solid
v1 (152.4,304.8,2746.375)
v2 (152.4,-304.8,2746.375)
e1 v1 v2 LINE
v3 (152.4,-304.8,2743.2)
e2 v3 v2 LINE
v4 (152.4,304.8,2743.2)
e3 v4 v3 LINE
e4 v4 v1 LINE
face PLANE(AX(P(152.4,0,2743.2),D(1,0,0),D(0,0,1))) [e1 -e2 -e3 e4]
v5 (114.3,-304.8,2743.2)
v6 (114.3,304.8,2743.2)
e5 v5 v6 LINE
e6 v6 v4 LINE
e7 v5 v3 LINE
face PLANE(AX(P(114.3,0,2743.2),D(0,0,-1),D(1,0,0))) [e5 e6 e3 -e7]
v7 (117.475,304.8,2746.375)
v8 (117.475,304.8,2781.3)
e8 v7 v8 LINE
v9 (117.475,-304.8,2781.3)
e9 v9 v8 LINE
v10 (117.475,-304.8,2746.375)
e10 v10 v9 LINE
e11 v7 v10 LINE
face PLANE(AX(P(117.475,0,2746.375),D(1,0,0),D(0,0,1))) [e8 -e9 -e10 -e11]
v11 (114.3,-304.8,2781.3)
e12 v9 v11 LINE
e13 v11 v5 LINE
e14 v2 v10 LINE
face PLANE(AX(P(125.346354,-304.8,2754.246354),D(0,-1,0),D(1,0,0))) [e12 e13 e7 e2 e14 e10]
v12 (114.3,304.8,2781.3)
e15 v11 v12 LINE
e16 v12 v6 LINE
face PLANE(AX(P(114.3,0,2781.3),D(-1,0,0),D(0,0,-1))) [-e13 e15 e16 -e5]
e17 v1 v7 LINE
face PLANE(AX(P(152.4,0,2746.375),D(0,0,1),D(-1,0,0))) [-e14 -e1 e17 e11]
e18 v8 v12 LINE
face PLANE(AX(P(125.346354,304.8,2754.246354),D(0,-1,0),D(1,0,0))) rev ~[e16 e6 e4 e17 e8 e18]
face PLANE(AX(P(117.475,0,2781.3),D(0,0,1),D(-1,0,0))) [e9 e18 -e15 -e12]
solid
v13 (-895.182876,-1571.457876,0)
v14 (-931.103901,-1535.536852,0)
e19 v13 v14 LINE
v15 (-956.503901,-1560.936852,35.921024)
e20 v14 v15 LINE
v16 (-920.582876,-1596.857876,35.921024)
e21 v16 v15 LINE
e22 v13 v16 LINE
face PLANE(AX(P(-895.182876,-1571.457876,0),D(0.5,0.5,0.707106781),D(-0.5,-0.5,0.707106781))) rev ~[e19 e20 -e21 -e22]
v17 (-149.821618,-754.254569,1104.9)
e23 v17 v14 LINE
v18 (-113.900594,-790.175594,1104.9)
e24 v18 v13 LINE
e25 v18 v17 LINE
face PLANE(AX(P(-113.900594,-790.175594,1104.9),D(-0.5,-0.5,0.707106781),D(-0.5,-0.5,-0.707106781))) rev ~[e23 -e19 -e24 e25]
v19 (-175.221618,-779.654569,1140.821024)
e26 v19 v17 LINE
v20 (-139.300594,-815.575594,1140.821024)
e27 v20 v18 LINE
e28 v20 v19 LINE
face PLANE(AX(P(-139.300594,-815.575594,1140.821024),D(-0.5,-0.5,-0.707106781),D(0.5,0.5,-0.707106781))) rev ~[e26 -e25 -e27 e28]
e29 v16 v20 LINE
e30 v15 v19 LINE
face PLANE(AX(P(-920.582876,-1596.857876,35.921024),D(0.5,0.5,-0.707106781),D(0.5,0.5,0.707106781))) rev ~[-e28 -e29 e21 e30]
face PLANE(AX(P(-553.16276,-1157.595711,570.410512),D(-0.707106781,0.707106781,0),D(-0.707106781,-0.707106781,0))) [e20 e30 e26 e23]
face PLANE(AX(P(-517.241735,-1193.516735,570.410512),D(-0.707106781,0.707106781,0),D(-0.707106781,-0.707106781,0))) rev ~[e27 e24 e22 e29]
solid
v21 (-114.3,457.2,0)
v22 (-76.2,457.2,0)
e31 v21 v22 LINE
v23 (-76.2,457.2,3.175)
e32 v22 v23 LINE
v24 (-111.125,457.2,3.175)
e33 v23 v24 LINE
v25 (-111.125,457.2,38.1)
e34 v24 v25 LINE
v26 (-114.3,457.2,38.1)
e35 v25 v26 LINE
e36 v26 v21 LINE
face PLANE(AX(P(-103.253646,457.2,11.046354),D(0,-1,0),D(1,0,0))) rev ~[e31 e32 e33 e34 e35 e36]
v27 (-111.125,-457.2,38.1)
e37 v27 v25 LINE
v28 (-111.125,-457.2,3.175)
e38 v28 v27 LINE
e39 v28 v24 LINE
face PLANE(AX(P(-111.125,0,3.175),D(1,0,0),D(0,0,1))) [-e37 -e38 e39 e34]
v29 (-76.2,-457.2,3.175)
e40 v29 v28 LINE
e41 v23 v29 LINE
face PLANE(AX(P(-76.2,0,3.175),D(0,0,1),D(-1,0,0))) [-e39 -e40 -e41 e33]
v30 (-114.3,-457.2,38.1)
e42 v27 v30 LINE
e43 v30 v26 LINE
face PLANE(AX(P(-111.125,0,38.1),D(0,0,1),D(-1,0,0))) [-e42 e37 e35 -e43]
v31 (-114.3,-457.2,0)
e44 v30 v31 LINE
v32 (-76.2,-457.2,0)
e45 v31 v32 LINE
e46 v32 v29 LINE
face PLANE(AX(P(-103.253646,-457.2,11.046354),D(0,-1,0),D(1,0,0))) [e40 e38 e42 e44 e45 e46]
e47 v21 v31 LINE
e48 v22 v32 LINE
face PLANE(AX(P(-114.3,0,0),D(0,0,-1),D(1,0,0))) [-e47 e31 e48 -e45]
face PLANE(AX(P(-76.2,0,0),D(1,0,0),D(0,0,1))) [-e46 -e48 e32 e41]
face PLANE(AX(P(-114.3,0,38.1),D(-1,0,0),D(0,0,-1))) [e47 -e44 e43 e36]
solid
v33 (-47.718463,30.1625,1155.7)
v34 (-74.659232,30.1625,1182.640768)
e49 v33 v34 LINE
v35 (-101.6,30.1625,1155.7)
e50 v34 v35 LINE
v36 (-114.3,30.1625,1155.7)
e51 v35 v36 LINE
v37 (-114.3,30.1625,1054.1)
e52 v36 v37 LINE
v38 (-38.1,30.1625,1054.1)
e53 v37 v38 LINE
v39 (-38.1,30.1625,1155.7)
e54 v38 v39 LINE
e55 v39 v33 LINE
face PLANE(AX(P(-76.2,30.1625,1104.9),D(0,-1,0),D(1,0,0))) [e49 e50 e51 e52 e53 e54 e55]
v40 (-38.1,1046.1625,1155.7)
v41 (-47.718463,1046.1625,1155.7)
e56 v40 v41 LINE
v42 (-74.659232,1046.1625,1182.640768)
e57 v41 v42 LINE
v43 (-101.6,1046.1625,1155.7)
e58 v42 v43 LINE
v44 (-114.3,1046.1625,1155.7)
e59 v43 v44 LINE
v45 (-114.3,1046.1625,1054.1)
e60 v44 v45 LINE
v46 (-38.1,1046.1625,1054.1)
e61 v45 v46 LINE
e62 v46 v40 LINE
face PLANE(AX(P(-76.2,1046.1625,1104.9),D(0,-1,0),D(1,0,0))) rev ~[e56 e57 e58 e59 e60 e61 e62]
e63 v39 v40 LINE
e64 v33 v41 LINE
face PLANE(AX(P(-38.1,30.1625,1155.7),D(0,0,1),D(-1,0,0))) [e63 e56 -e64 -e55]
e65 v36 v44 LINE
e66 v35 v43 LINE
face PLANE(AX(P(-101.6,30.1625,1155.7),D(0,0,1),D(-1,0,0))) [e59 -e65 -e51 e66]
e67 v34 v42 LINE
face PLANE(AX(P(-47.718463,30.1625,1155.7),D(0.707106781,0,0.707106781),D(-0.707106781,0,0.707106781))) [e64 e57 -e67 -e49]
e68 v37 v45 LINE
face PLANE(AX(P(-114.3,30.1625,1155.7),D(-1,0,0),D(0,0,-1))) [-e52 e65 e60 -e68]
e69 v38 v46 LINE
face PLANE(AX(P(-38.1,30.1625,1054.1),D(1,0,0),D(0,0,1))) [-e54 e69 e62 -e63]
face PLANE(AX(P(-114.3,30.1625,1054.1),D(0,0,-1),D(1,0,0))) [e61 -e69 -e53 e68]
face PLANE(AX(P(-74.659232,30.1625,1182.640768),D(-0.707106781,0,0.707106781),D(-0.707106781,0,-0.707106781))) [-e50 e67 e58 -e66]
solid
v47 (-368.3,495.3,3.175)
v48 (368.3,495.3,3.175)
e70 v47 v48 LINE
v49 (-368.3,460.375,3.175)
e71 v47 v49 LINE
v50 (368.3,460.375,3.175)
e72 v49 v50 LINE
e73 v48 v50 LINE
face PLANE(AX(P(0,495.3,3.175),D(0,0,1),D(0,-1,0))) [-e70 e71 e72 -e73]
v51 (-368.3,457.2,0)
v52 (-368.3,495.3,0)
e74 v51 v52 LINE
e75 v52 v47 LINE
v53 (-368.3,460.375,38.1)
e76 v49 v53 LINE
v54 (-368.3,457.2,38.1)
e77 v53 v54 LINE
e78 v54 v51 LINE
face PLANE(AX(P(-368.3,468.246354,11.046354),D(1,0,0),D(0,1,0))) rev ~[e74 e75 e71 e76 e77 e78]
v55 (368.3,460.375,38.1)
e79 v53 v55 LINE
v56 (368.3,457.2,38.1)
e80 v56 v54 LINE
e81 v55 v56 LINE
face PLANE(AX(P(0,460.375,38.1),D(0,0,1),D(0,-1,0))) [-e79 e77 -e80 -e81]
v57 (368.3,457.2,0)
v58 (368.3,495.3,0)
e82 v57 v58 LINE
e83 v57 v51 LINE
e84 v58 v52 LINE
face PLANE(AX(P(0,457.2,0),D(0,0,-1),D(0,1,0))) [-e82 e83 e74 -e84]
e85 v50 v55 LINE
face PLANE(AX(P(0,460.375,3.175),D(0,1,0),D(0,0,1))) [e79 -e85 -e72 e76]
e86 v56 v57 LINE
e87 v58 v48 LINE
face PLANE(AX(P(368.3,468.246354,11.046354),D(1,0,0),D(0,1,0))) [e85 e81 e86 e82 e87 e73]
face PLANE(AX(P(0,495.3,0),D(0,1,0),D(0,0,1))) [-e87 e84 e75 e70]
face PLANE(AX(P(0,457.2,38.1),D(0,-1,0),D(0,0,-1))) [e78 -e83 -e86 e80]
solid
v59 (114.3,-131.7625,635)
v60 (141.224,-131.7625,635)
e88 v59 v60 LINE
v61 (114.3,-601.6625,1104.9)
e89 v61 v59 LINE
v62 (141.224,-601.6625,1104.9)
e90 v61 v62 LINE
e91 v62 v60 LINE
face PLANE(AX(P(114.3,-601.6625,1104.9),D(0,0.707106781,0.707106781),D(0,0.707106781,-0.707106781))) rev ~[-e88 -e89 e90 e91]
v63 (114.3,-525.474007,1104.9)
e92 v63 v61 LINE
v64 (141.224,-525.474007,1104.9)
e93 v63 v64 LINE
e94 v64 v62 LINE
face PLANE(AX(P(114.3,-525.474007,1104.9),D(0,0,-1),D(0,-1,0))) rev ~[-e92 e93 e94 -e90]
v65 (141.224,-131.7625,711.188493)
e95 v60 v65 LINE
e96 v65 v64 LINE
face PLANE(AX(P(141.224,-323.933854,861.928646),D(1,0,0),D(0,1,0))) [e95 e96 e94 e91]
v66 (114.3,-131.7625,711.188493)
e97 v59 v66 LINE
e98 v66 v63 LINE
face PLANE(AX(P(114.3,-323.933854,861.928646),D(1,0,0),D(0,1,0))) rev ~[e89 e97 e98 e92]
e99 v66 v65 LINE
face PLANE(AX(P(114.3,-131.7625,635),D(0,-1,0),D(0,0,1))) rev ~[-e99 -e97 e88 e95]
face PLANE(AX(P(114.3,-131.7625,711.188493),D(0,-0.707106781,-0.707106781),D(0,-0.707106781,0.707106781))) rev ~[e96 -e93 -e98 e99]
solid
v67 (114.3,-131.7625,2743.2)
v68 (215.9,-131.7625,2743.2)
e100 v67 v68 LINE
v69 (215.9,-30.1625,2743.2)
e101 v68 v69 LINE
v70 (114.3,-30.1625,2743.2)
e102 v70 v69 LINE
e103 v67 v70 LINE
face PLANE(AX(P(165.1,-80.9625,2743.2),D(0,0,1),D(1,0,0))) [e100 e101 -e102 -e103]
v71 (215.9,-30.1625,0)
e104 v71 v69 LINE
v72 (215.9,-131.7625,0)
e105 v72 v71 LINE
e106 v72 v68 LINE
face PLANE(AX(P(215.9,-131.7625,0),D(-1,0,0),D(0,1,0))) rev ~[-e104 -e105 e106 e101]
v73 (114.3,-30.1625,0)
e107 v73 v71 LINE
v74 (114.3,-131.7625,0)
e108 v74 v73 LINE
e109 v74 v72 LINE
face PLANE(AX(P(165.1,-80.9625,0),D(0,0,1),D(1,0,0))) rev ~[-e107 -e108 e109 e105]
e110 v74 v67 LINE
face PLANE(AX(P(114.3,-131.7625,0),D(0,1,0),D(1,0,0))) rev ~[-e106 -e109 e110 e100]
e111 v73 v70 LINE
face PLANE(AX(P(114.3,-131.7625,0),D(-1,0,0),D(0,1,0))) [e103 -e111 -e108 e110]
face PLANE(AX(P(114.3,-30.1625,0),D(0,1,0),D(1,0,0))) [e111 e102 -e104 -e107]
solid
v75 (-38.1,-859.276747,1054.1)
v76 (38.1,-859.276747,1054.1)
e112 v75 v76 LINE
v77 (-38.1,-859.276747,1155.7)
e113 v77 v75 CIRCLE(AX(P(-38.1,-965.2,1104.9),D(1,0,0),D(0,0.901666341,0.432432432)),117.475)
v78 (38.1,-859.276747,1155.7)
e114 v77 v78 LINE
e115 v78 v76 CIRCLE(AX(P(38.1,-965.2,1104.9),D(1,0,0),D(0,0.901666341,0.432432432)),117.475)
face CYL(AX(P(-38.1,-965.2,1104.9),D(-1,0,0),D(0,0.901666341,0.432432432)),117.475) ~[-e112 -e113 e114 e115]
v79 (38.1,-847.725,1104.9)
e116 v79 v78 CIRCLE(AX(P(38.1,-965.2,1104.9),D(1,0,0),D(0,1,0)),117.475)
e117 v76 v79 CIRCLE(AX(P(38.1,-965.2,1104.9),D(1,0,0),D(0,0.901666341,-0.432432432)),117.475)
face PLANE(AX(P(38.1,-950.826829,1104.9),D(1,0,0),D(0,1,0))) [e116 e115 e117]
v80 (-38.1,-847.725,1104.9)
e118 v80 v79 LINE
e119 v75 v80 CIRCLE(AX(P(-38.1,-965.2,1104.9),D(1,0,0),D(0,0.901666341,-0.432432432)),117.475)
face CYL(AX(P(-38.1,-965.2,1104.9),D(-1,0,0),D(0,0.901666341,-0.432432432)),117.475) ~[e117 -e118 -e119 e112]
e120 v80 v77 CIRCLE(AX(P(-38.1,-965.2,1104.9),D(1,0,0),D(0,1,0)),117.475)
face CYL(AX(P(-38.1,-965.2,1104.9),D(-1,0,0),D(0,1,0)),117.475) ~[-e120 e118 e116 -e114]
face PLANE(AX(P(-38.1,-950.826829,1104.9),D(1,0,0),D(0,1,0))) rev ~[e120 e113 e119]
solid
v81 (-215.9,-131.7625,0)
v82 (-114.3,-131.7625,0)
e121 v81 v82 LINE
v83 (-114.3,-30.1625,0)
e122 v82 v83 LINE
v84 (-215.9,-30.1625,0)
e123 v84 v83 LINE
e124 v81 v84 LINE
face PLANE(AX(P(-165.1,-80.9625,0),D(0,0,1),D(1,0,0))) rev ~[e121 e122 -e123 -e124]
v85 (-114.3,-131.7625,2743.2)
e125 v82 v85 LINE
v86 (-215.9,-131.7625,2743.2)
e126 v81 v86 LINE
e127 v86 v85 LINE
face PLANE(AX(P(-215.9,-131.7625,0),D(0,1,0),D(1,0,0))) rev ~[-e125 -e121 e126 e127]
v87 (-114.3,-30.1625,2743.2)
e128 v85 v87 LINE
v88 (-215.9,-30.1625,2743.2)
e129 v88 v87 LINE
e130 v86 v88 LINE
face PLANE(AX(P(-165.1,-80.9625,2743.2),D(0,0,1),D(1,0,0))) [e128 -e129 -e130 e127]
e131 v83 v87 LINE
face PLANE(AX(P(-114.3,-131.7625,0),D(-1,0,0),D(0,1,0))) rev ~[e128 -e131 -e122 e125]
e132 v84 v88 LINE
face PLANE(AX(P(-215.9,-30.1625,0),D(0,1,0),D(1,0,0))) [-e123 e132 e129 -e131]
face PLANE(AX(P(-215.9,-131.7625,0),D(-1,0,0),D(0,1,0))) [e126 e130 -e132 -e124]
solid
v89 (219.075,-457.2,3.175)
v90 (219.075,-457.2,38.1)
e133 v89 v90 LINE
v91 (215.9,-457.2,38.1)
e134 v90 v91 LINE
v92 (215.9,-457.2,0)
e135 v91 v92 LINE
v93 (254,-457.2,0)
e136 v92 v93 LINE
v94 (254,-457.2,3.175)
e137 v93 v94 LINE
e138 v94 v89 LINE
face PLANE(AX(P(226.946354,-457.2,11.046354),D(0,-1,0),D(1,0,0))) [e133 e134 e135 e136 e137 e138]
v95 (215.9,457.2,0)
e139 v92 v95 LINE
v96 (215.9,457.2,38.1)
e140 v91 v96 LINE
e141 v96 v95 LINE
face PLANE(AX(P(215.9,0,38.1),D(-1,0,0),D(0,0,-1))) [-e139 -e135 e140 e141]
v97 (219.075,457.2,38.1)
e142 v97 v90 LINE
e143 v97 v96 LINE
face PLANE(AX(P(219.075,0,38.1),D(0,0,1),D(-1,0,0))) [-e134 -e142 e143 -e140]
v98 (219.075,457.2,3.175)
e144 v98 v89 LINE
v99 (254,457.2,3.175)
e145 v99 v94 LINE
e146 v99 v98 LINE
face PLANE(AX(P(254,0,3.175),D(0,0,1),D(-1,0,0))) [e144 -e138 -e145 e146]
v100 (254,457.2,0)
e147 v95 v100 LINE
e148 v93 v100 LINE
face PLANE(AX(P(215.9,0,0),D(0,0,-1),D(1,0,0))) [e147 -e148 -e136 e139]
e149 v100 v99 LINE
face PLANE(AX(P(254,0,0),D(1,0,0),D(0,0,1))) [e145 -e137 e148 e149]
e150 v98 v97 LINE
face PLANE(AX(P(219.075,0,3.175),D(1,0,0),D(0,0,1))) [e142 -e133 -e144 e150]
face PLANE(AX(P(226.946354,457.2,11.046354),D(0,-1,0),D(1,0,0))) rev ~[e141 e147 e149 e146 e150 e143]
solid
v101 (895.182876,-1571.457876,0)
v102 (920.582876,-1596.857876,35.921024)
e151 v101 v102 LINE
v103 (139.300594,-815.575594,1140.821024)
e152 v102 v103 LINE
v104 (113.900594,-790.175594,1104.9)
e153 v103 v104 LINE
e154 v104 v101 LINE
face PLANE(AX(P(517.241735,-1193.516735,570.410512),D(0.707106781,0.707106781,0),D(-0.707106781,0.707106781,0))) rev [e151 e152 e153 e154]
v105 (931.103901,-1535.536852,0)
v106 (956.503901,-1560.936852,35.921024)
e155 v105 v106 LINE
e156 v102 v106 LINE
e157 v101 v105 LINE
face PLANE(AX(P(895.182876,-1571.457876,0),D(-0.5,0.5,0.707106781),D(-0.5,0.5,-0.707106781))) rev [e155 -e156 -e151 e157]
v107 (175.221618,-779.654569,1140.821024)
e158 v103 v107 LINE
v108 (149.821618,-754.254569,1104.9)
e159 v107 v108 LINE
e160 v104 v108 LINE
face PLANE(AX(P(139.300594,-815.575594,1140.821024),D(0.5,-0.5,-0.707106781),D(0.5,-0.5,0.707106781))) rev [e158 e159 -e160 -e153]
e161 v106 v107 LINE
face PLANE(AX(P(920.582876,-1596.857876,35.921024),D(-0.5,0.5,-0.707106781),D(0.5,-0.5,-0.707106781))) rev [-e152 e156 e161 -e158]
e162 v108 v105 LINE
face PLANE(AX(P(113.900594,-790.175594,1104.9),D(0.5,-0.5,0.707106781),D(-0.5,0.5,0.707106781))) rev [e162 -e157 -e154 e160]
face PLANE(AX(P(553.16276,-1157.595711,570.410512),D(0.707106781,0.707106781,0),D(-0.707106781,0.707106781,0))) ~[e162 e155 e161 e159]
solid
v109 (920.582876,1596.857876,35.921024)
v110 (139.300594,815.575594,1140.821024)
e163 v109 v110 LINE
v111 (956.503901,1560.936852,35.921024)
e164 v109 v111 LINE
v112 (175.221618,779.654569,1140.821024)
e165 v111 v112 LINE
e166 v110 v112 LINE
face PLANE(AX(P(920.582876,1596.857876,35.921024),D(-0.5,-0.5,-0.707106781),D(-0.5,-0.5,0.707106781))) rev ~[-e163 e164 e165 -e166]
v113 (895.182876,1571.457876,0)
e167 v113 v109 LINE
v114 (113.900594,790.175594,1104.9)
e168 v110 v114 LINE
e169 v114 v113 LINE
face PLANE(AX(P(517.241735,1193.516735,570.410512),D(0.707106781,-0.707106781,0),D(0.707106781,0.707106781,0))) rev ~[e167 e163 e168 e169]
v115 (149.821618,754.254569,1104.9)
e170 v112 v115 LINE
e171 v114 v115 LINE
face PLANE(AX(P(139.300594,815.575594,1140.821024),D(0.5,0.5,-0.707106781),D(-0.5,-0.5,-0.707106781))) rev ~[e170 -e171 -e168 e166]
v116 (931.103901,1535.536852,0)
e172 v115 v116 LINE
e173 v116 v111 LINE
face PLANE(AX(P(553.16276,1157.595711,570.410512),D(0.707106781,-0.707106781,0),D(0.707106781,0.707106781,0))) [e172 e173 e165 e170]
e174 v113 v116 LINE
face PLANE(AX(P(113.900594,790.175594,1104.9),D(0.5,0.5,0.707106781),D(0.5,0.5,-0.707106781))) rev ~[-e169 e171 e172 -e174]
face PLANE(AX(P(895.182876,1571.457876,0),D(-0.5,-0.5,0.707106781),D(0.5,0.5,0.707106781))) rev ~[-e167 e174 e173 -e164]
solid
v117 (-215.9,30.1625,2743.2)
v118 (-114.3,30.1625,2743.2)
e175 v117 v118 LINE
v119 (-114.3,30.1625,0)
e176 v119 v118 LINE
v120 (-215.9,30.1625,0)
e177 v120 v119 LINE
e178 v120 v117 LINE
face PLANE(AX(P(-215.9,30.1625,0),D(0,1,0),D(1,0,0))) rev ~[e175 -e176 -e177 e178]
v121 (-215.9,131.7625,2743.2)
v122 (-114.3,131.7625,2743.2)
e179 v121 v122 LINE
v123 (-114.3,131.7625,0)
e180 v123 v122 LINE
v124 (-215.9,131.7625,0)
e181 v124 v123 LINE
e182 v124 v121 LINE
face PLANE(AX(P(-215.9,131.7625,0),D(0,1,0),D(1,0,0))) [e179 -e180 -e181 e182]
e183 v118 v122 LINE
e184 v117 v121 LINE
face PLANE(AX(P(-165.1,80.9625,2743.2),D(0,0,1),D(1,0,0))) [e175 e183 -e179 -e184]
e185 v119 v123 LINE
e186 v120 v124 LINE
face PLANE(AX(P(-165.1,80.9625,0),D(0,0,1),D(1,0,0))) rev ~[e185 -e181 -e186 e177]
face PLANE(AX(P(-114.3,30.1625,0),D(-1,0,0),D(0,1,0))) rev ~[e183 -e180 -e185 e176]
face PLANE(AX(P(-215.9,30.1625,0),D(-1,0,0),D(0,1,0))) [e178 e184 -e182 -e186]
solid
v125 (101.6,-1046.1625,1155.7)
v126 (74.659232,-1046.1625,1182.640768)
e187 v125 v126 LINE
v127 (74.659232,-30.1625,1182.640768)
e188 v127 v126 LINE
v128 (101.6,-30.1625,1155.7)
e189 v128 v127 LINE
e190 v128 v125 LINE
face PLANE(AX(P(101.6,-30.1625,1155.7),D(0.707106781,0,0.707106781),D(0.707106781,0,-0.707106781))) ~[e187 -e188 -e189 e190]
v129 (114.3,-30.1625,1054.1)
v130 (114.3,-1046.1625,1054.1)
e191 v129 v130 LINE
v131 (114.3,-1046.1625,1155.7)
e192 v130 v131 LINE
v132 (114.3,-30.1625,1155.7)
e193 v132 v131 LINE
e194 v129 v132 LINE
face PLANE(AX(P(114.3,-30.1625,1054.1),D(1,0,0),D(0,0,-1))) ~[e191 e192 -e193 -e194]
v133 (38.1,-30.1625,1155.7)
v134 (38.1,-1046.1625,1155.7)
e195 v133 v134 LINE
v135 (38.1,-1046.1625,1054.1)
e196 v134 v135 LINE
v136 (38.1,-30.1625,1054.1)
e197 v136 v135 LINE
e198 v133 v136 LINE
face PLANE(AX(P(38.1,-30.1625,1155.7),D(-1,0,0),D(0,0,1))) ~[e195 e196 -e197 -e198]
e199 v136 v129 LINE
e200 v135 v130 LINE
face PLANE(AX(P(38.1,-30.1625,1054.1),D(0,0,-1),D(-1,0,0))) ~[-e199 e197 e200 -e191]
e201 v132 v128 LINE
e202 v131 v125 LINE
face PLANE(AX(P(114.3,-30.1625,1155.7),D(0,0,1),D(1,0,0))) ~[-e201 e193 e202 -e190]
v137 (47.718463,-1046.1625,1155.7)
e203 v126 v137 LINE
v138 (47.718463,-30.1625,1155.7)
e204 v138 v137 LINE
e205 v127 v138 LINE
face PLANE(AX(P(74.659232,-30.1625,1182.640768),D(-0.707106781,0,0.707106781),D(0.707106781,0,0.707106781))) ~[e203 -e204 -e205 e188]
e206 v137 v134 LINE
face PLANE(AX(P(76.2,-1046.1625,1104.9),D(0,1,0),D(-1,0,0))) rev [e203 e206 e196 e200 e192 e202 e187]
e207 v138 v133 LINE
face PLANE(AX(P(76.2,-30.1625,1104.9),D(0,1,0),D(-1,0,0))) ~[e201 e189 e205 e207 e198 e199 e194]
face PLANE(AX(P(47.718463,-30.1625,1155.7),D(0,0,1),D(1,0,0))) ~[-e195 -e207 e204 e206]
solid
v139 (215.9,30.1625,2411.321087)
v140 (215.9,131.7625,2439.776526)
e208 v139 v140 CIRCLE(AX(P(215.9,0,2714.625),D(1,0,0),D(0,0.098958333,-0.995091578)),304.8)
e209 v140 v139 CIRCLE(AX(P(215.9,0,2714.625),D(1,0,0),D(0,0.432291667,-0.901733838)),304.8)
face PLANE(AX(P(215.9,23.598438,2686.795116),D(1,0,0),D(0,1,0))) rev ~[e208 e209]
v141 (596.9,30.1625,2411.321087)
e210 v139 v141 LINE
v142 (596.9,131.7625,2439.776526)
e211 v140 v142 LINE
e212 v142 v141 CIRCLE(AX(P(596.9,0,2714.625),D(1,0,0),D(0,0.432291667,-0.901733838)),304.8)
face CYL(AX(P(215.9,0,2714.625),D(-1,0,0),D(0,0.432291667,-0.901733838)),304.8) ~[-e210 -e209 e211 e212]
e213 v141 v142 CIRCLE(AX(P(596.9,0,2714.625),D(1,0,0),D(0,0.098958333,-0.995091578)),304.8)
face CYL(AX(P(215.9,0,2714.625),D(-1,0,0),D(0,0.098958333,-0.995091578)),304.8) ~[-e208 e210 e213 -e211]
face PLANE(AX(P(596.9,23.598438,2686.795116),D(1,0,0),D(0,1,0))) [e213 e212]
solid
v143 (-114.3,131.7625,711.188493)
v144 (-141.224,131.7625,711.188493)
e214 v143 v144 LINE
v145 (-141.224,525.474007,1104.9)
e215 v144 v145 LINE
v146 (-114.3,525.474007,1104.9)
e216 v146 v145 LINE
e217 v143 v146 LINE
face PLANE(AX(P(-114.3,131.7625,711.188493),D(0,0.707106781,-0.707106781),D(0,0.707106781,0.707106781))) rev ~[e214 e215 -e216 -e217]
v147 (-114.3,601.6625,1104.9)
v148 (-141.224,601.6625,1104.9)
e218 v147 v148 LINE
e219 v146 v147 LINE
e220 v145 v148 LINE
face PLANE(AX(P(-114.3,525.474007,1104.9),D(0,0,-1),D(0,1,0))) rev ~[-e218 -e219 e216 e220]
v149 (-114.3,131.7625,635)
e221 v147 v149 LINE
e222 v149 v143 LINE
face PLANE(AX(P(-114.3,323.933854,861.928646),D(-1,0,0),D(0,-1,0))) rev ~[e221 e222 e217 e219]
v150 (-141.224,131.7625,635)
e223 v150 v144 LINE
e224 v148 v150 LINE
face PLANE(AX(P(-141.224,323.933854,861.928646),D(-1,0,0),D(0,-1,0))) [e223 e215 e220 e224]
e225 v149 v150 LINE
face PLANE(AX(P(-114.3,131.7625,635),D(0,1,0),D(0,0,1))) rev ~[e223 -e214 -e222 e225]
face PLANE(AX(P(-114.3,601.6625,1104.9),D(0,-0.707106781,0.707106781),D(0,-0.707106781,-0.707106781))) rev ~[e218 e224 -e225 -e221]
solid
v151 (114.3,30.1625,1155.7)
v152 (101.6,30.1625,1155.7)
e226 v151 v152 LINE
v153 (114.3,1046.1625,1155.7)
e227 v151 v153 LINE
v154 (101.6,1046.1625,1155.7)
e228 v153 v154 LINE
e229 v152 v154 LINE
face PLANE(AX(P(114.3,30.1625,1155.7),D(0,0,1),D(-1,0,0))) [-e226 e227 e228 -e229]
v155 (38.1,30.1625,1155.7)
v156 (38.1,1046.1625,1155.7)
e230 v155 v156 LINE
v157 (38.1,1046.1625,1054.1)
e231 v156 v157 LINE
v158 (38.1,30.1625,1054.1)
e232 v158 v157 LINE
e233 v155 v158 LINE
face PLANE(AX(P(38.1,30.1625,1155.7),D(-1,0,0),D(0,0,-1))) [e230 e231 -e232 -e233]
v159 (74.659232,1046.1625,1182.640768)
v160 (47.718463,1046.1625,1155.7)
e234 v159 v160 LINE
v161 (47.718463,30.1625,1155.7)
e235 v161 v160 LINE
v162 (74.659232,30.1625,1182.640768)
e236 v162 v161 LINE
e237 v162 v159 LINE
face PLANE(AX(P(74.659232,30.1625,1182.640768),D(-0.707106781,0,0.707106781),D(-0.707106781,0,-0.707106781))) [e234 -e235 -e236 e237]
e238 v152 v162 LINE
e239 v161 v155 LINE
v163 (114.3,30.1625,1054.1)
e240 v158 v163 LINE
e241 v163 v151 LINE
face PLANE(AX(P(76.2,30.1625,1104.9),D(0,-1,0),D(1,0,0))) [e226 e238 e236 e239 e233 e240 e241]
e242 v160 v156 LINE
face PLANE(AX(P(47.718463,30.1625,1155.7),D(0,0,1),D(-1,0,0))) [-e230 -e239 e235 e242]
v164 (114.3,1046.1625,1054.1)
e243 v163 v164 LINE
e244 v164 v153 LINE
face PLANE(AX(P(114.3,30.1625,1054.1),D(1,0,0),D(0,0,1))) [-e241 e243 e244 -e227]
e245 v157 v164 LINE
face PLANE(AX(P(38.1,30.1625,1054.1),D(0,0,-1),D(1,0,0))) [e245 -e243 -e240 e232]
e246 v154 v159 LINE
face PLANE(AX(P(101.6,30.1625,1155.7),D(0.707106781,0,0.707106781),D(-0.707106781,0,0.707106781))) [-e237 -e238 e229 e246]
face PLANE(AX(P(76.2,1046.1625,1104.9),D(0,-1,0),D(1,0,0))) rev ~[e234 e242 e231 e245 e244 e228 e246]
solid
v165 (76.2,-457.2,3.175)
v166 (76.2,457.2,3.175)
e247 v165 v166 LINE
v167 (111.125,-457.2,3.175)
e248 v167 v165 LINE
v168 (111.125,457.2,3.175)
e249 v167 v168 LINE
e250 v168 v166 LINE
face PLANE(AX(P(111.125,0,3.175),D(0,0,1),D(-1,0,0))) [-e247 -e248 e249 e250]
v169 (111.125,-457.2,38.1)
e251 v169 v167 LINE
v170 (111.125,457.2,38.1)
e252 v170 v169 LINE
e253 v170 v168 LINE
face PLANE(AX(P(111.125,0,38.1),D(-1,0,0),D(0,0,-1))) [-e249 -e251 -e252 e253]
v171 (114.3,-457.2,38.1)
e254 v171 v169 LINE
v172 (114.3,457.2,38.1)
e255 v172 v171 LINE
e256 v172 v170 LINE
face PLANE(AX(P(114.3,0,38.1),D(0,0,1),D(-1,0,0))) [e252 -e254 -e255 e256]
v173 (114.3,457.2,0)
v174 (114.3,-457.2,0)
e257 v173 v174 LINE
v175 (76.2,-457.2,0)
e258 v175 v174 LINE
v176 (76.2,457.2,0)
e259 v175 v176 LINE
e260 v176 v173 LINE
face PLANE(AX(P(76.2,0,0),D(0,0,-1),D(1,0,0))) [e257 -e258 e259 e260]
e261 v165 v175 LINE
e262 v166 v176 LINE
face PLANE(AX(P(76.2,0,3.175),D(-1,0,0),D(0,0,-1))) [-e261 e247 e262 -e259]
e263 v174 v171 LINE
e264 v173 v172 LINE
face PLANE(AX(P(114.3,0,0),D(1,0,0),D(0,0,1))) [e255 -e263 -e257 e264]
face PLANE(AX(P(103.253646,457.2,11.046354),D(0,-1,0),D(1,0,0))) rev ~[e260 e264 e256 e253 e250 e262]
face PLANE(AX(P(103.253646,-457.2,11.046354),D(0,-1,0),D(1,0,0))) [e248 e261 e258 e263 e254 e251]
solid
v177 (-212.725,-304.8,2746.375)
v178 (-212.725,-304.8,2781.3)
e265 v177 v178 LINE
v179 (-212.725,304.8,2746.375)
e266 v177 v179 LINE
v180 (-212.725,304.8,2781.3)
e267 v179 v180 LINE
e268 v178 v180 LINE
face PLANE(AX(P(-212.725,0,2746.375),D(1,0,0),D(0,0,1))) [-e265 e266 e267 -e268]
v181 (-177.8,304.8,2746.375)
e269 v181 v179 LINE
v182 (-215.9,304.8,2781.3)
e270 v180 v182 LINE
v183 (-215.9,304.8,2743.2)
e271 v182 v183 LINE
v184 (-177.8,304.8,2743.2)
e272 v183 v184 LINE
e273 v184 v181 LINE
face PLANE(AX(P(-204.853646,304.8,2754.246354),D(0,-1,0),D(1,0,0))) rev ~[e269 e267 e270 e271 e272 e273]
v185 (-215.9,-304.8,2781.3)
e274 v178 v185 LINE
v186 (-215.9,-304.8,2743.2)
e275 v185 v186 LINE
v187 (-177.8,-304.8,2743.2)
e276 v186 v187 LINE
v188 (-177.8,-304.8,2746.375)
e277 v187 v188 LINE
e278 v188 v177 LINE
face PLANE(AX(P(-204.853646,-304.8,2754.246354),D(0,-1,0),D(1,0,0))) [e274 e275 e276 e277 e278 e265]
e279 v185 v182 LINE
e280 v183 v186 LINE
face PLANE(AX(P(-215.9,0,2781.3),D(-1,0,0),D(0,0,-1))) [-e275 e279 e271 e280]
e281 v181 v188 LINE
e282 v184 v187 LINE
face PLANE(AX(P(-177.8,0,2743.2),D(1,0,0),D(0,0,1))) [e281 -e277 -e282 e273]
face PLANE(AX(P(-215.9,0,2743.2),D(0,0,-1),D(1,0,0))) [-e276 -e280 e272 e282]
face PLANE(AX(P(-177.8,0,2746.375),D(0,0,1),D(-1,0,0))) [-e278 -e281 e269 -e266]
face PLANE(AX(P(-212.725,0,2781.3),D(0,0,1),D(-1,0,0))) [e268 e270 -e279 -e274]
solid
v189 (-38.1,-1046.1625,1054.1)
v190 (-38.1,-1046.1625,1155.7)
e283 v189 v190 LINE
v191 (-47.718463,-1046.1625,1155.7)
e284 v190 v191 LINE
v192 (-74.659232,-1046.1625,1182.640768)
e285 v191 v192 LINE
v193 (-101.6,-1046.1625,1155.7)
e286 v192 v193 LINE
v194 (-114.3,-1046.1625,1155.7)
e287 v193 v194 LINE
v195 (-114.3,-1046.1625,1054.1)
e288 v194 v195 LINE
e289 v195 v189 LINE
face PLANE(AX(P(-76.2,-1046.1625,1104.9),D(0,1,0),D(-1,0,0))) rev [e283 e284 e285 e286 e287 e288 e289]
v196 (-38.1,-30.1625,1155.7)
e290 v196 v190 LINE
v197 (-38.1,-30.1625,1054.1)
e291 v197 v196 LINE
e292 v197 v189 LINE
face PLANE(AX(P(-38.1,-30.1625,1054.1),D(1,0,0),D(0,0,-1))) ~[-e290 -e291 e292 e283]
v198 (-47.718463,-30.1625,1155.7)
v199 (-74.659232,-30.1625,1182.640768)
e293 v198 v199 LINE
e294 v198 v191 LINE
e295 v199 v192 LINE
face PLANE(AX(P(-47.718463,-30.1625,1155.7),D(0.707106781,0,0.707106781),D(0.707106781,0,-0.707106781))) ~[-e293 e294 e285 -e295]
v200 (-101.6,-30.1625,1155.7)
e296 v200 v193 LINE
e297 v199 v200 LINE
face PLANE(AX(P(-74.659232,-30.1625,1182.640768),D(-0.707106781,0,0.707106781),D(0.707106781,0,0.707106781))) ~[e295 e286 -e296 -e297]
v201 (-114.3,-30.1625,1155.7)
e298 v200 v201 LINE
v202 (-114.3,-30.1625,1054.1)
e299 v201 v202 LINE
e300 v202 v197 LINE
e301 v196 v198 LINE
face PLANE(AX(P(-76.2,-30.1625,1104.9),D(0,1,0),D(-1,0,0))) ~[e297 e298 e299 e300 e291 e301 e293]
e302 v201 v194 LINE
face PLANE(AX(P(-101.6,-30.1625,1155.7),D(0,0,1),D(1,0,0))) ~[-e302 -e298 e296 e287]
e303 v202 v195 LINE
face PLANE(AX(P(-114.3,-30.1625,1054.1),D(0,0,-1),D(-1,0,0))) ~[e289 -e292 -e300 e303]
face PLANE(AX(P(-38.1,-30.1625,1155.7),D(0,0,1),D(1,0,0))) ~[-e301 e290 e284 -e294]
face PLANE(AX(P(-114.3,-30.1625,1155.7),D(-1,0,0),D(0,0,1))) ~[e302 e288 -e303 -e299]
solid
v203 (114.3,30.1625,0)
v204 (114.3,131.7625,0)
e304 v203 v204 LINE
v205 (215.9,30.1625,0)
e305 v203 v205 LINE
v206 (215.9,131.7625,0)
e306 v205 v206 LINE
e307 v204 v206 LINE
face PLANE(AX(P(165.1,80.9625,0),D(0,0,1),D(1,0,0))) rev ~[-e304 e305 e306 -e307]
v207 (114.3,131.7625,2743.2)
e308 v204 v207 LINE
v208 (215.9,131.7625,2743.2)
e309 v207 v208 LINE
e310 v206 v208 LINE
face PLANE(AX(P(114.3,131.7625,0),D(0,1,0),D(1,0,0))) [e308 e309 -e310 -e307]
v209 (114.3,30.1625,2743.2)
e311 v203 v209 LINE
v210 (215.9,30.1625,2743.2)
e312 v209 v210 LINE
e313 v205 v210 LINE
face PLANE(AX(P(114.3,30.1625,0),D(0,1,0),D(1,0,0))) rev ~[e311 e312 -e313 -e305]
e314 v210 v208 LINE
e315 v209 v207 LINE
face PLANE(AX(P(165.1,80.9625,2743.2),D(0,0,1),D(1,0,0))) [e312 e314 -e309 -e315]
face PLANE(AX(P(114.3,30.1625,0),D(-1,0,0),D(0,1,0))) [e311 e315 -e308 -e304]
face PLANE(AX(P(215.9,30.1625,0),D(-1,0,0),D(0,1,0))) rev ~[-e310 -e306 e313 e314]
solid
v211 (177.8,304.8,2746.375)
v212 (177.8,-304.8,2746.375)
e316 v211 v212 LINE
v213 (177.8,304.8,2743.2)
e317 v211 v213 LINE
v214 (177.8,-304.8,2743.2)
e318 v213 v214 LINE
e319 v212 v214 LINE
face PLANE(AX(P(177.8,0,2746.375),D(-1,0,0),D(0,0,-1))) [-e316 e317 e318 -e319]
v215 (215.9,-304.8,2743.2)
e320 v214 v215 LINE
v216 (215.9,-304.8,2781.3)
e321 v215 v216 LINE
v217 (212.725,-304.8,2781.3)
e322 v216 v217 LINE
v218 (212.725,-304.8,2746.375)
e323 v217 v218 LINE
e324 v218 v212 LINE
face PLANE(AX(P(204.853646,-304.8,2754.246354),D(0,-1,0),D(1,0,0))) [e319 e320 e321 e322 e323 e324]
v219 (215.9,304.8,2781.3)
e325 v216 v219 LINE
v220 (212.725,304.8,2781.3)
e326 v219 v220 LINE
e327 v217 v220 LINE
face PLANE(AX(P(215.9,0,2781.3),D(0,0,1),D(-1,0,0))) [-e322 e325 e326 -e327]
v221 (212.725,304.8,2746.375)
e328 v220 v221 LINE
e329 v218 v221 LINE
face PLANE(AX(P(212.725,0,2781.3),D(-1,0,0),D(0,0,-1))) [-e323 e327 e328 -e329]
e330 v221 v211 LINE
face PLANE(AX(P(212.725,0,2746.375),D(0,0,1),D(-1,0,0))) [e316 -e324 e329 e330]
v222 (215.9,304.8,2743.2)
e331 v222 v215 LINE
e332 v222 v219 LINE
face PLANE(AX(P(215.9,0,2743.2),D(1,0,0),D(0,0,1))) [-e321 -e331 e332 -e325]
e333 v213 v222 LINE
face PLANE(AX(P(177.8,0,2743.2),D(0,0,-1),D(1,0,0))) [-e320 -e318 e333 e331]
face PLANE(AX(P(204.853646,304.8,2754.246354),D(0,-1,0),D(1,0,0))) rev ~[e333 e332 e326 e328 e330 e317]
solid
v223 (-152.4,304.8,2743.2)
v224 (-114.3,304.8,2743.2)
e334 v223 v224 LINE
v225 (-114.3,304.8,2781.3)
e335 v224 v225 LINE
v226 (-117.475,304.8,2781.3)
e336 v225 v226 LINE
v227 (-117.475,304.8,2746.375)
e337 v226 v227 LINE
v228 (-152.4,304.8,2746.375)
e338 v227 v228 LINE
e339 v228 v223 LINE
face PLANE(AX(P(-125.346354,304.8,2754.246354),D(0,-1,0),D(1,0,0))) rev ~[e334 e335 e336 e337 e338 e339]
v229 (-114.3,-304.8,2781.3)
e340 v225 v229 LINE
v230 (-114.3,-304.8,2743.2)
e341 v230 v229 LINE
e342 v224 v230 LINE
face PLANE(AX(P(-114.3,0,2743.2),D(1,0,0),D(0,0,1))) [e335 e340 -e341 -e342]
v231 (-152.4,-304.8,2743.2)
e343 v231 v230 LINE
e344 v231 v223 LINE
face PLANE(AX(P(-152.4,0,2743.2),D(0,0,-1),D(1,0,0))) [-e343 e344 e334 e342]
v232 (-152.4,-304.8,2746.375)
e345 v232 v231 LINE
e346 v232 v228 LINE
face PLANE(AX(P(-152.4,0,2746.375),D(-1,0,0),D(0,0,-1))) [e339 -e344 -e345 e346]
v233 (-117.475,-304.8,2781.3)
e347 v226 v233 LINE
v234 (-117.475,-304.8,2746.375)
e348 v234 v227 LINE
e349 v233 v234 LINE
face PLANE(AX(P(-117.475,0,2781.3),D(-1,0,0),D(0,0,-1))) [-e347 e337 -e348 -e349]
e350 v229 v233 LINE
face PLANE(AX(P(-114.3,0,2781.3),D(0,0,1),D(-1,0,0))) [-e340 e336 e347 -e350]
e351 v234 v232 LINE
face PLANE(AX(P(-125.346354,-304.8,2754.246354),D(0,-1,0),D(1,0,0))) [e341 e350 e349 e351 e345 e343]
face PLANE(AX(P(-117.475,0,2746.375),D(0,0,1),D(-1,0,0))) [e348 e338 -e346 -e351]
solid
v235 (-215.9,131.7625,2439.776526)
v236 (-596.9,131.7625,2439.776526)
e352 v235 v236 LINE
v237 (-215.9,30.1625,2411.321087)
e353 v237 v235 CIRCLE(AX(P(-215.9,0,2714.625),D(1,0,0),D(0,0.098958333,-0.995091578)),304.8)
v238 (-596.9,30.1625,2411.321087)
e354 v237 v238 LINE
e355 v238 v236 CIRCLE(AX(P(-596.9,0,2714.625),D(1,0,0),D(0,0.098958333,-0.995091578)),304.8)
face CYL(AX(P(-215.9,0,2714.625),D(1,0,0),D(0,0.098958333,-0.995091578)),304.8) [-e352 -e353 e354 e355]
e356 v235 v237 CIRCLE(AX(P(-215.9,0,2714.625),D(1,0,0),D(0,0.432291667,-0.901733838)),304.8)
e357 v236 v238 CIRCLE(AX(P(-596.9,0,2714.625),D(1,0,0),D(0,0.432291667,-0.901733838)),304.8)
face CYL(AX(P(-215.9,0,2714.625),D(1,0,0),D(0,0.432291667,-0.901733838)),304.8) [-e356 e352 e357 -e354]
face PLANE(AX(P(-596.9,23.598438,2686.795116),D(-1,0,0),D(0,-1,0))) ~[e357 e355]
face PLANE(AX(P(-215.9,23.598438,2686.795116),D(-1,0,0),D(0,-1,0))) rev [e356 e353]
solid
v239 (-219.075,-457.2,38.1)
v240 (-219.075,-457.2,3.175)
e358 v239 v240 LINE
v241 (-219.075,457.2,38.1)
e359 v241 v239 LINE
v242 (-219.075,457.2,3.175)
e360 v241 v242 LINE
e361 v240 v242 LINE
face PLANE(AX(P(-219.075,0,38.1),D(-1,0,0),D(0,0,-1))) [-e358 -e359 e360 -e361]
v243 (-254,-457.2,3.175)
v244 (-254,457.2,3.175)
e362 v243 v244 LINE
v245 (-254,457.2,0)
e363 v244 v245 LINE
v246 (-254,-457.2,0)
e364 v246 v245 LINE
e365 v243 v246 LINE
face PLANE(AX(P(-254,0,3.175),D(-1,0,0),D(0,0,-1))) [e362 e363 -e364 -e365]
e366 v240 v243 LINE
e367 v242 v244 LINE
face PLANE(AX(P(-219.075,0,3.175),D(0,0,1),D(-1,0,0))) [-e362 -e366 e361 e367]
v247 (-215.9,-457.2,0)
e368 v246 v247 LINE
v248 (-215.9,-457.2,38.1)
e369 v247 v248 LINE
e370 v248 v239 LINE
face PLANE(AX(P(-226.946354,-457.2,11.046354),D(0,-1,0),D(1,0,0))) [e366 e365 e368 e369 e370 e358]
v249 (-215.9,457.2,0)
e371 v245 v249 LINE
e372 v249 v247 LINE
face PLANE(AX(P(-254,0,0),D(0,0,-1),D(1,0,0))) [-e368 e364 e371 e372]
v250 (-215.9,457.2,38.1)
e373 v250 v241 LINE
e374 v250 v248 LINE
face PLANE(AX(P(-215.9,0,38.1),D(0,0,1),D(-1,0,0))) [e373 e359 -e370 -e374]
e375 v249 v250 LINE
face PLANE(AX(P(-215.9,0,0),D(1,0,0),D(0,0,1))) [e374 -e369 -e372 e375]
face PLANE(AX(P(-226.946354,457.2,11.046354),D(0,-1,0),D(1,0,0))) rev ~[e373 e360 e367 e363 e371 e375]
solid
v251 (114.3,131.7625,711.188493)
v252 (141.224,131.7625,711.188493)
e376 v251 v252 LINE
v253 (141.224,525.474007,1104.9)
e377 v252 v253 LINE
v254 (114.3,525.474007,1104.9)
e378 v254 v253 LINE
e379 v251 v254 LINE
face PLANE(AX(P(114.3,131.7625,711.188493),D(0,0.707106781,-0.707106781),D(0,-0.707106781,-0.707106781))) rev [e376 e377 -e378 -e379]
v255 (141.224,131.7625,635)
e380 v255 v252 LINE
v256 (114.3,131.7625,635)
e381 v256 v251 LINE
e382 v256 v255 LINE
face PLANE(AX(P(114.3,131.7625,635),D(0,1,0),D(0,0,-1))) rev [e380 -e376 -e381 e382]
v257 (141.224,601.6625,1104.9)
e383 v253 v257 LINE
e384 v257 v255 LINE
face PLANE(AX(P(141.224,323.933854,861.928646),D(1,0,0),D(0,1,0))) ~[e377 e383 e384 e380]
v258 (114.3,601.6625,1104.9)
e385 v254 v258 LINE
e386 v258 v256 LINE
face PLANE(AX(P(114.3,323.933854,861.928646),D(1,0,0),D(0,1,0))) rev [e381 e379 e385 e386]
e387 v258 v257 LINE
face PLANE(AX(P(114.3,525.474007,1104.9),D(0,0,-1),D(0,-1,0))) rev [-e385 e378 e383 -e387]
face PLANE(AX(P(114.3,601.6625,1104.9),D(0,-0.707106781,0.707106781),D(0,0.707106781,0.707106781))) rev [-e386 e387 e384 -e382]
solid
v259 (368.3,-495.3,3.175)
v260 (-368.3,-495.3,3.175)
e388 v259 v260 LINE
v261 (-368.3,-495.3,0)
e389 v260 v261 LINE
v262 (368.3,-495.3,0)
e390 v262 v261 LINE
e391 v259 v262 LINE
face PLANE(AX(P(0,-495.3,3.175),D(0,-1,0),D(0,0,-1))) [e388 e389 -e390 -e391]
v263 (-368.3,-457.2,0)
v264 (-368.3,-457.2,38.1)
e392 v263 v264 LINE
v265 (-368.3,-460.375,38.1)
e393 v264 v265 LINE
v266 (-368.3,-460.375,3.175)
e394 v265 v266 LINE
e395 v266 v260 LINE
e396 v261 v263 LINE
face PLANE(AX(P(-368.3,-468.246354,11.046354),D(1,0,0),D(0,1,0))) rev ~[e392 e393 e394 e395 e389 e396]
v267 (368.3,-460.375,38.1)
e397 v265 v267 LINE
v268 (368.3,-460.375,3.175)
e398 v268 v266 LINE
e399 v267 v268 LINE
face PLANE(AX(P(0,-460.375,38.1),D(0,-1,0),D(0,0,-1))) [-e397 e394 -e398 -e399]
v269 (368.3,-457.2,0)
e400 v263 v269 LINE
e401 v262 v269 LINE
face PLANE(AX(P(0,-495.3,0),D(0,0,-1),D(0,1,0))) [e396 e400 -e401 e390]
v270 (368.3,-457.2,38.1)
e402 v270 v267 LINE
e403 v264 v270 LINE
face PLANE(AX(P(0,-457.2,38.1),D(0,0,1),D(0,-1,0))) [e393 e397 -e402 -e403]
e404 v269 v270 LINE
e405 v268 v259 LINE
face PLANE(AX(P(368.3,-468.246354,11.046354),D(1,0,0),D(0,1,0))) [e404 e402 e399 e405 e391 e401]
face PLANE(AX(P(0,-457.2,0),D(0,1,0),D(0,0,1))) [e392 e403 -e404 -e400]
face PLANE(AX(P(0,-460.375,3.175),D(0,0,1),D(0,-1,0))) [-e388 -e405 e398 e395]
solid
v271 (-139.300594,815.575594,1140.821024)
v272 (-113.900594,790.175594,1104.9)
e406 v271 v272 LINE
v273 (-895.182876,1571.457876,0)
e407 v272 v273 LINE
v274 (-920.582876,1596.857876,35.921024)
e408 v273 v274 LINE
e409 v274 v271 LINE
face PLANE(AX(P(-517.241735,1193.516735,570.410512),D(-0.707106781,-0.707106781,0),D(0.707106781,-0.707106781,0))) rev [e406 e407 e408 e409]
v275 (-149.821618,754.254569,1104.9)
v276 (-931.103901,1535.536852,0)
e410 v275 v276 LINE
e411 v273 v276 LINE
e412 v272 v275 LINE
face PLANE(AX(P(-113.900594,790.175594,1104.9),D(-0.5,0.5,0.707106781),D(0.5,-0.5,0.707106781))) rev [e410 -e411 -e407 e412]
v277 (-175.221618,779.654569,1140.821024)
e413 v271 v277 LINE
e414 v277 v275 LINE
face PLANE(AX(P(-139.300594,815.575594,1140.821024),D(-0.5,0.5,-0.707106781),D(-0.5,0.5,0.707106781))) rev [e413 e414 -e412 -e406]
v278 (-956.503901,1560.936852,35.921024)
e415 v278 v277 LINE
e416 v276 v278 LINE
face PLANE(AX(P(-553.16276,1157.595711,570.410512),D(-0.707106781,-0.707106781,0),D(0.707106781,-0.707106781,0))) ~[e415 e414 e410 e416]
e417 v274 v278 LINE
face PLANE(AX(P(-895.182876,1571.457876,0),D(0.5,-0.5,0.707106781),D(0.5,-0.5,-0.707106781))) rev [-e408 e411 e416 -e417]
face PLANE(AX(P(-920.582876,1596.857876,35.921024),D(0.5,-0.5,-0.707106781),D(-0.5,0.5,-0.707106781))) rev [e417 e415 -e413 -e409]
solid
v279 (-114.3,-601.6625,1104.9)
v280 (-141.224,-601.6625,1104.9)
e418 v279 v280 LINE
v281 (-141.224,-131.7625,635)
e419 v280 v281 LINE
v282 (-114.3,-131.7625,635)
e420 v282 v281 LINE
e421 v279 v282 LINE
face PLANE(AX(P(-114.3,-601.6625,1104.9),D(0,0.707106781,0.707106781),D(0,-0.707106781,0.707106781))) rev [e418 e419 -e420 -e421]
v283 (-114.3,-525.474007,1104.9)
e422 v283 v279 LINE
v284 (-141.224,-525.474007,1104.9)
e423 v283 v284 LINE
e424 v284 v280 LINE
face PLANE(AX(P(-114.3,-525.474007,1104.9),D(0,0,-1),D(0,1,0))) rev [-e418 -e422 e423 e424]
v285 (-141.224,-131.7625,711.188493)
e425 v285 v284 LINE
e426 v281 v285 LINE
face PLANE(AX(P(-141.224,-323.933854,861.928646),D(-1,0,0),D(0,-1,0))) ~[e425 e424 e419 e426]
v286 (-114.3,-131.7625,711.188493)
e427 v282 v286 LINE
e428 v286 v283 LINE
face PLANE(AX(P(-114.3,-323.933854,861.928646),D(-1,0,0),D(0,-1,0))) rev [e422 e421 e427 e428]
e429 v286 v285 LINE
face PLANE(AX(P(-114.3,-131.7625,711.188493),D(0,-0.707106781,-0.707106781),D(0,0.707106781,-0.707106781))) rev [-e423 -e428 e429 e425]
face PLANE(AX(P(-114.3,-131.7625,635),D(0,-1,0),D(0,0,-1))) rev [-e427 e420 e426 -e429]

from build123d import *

# Parameters (mm, degrees)
F0_W      = 101.6
F0_H      = 101.6
F1_DEPTH  = 2743.2
F3_DEPTH  = 1016
F6_DEPTH  = 76.2
F8_DEPTH  = 26.924
F12_DEPTH = 457.2
F14_DEPTH = 368.3
F17_DEPTH = 304.8
F15_R     = 30.1625
F18_DEPTH = 381
F22_DEPTH = 50.8


with BuildPart() as f1:
    # F0 (on Top) → F1 (new body)
    with BuildSketch(Plane.XY):
        with Locations((-165.1, -80.9625)):
            Rectangle(F0_W, F0_H)
    extrude(amount=F1_DEPTH)


with BuildPart() as f1b:
    # F0 (on Top) → F1, piece 2 (new body)
    with BuildSketch(Plane.XY):
        with Locations((-165.1, 80.9625)):
            Rectangle(F0_W, F0_H)
    extrude(amount=F1_DEPTH)


with BuildPart() as f1c:
    # F0 (on Top) → F1, piece 3 (new body)
    with BuildSketch(Plane.XY):
        with Locations((165.1, 80.9625)):
            Rectangle(F0_W, F0_H)
    extrude(amount=F1_DEPTH)


with BuildPart() as f1d:
    # F0 (on Top) → F1, piece 4 (new body)
    with BuildSketch(Plane.XY):
        with Locations((165.1, -80.9625)):
            Rectangle(F0_W, F0_H)
    extrude(amount=F1_DEPTH)


with BuildPart() as f3:
    # F2 (on face) → F3 (new body)
    with BuildSketch(Plane.XZ.offset(-30.1625)):
        Polygon((-101.6, 1155.7), (-114.3, 1155.7), (-114.3, 1054.1), (-38.1, 1054.1), (-38.1, 1155.7), (-47.7184632736, 1155.7), align=None)
        Polygon((-74.6592316368, 1182.6407683632), (-101.6, 1155.7), (-47.7184632736, 1155.7), align=None)
    extrude(amount=-F3_DEPTH)


with BuildPart() as f3b:
    # F2 (on face) → F3, piece 2 (new body)
    with BuildSketch(Plane.XZ.offset(-30.1625)):
        Polygon((114.3, 1054.1), (114.3, 1155.7), (101.6, 1155.7), (47.7184632736, 1155.7), (38.1, 1155.7), (38.1, 1054.1), align=None)
        Polygon((47.7184632736, 1155.7), (101.6, 1155.7), (74.6592316368, 1182.6407683632), align=None)
    extrude(amount=-F3_DEPTH)


with BuildPart() as f4_1:
    # F4: instance of F3b
    add(f3b.part.mirror(Plane.XZ))


with BuildPart() as f4_2:
    # F4: instance of F3
    add(f3.part.mirror(Plane.XZ))


with BuildPart() as f6:
    # F5 (on face) → F6 (new body)
    with BuildSketch(Plane.YZ.offset(-38.1)):
        with BuildLine():
            ThreePointArc((-859.2767465332, 1054.1), (-850.6493347335, 1078.8515698747), (-847.725, 1104.9))
            ThreePointArc((-847.725, 1104.9), (-850.6493347335, 1130.9484301253), (-859.2767465332, 1155.7))
            Line((-859.2767465332, 1155.7), (-1046.1625, 1155.7))
            Line((-1046.1625, 1155.7), (-1046.1625, 1054.1))
            Line((-1046.1625, 1054.1), (-859.2767465332, 1054.1))
        make_face()
        with BuildLine():
            Line((-1046.1625, 1155.7), (-859.2767465332, 1155.7))
            ThreePointArc((-859.2767465332, 1155.7), (-1082.675, 1104.9), (-859.2767465332, 1054.1))
            Line((-859.2767465332, 1054.1), (-1046.1625, 1054.1))
            Line((-1046.1625, 1054.1), (-1046.1625, 1155.7))
        make_face()
    extrude(amount=F6_DEPTH)


with BuildPart() as f8:
    # F7 (on face) → F8 (new body)
    with BuildSketch(Plane.YZ.offset(114.3)):
        Polygon((-550.8625, 1054.1), (-131.7625, 635), (-131.7625, 711.1884929312), (-474.6740070688, 1054.1), align=None)
        Polygon((-601.6625, 1104.9), (-550.8625, 1054.1), (-474.6740070688, 1054.1), (-525.4740070688, 1104.9), align=None)
    extrude(amount=F8_DEPTH)


with BuildPart() as f9_1:
    # F9: instance of F8
    add(f8.part.mirror(Plane.XZ))


with BuildPart() as f10_1:
    # F10: instance of F8
    add(f8.part.mirror(Plane.YZ))


with BuildPart() as f10_2:
    # F10: instance of F9_1
    add(f9_1.part.mirror(Plane.YZ))


with BuildPart() as f12:
    # F11 (on Front) → F12 (new body, symmetric)
    with BuildSketch(Plane.XZ):
        Polygon((-254, 0), (-215.9, 0), (-215.9, 38.1), (-219.075, 38.1), (-219.075, 3.175), (-254, 3.175), align=None)
    extrude(amount=F12_DEPTH, both=True)


with BuildPart() as f12b:
    # F11 (on Front) → F12, piece 2 (new body, symmetric)
    with BuildSketch(Plane.XZ):
        Polygon((-114.3, 38.1), (-114.3, 0), (-76.2, 0), (-76.2, 3.175), (-111.125, 3.175), (-111.125, 38.1), align=None)
    extrude(amount=F12_DEPTH, both=True)


with BuildPart() as f12c:
    # F11 (on Front) → F12, piece 3 (new body, symmetric)
    with BuildSketch(Plane.XZ):
        Polygon((76.2, 0), (114.3, 0), (114.3, 38.1), (111.125, 38.1), (111.125, 3.175), (76.2, 3.175), align=None)
    extrude(amount=F12_DEPTH, both=True)


with BuildPart() as f12d:
    # F11 (on Front) → F12, piece 4 (new body, symmetric)
    with BuildSketch(Plane.XZ):
        Polygon((254, 0), (254, 3.175), (219.075, 3.175), (219.075, 38.1), (215.9, 38.1), (215.9, 0), align=None)
    extrude(amount=F12_DEPTH, both=True)


with BuildPart() as f14:
    # F13 (on Right) → F14 (new body, symmetric)
    with BuildSketch(Plane.YZ):
        Polygon((-495.3, 0), (-457.2, 0), (-457.2, 38.1), (-460.375, 38.1), (-460.375, 3.175), (-495.3, 3.175), align=None)
    extrude(amount=F14_DEPTH, both=True)


with BuildPart() as f14b:
    # F13 (on Right) → F14, piece 2 (new body, symmetric)
    with BuildSketch(Plane.YZ):
        Polygon((495.3, 0), (495.3, 3.175), (460.375, 3.175), (460.375, 38.1), (457.2, 38.1), (457.2, 0), align=None)
    extrude(amount=F14_DEPTH, both=True)


with BuildPart() as f17:
    # F16 (on Front) → F17 (new body, symmetric)
    with BuildSketch(Plane.XZ):
        Polygon((114.3, 2743.2), (152.4, 2743.2), (152.4, 2746.375), (117.475, 2746.375), (117.475, 2781.3), (114.3, 2781.3), align=None)
    extrude(amount=F17_DEPTH, both=True)


with BuildPart() as f17b:
    # F16 (on Front) → F17, piece 2 (new body, symmetric)
    with BuildSketch(Plane.XZ):
        Polygon((212.725, 2746.375), (177.8, 2746.375), (177.8, 2743.2), (215.9, 2743.2), (215.9, 2781.3), (212.725, 2781.3), align=None)
    extrude(amount=F17_DEPTH, both=True)


with BuildPart() as f17c:
    # F16 (on Front) → F17, piece 3 (new body, symmetric)
    with BuildSketch(Plane.XZ):
        Polygon((-215.9, 2781.3), (-215.9, 2743.2), (-177.8, 2743.2), (-177.8, 2746.375), (-212.725, 2746.375), (-212.725, 2781.3), align=None)
    extrude(amount=F17_DEPTH, both=True)


with BuildPart() as f17d:
    # F16 (on Front) → F17, piece 4 (new body, symmetric)
    with BuildSketch(Plane.XZ):
        Polygon((-152.4, 2743.2), (-114.3, 2743.2), (-114.3, 2781.3), (-117.475, 2781.3), (-117.475, 2746.375), (-152.4, 2746.375), align=None)
    extrude(amount=F17_DEPTH, both=True)


with BuildPart() as f18:
    # F15 (on face) → F18 (new body)
    with BuildSketch(Plane.YZ.offset(215.9)):
        with BuildLine():
            Line((30.1625, 2411.3210870781), (30.1625, 2714.625))
            Line((30.1625, 2714.625), (30.1625, 2743.2))
            Line((30.1625, 2743.2), (131.7625, 2743.2))
            Line((131.7625, 2743.2), (131.7625, 2439.7765261208))
            ThreePointArc((131.7625, 2439.7765261208), (257.9382193472, 2552.2337594727), (304.8, 2714.625))
            ThreePointArc((304.8, 2714.625), (-225.9386753081, 2919.2093469086), (30.1625, 2411.3210870781))
        make_face()
        with Locations((0, 2714.625)):
            Circle(F15_R, mode=Mode.SUBTRACT)
        with BuildLine():
            Line((30.1625, 2743.2), (30.1625, 2714.625))
            Line((30.1625, 2714.625), (30.1625, 2411.3210870781))
            ThreePointArc((30.1625, 2411.3210870781), (82.2031289491, 2421.1191472628), (131.7625, 2439.7765261208))
            Line((131.7625, 2439.7765261208), (131.7625, 2743.2))
            Line((131.7625, 2743.2), (30.1625, 2743.2))
        make_face()
        with Locations((0, 2714.625)):
            Circle(F15_R)
    extrude(amount=F18_DEPTH)


with BuildPart() as f19_1:
    # F19: instance of F18
    add(f18.part.mirror(Plane.YZ))


with BuildPart() as f22:
    # F21 (on face) → F22 (new body)
    with BuildSketch(Plane(origin=(338.1375, -338.1375, 0), x_dir=(-0.7071067812, -0.7071067812, 0), z_dir=(-0.7071067812, 0.7071067812, 0))):
        Polygon((675.199427547, 1140.8210244843), (639.2784030627, 1104.9), (1744.1784030627, 0), (1780.099427547, 35.9210244843), align=None)
    extrude(amount=F22_DEPTH)


with BuildPart() as f23_1:
    # F23: instance of F22
    add(f22.part.mirror(Plane.YZ))


with BuildPart() as f24_1:
    # F24: instance of F22
    add(f22.part.mirror(Plane.XZ))


with BuildPart() as f24_2:
    # F24: instance of F23_1
    add(f23_1.part.mirror(Plane.XZ))


solid = Compound([f1.part, f1b.part, f1c.part, f1d.part, f3.part, f3b.part, f4_1.part, f4_2.part, f6.part, f8.part, f9_1.part, f10_1.part, f10_2.part, f12.part, f12b.part, f12c.part, f12d.part, f14.part, f14b.part, f17.part, f17b.part, f17c.part, f17d.part, f18.part, f19_1.part, f22.part, f23_1.part, f24_1.part, f24_2.part])
